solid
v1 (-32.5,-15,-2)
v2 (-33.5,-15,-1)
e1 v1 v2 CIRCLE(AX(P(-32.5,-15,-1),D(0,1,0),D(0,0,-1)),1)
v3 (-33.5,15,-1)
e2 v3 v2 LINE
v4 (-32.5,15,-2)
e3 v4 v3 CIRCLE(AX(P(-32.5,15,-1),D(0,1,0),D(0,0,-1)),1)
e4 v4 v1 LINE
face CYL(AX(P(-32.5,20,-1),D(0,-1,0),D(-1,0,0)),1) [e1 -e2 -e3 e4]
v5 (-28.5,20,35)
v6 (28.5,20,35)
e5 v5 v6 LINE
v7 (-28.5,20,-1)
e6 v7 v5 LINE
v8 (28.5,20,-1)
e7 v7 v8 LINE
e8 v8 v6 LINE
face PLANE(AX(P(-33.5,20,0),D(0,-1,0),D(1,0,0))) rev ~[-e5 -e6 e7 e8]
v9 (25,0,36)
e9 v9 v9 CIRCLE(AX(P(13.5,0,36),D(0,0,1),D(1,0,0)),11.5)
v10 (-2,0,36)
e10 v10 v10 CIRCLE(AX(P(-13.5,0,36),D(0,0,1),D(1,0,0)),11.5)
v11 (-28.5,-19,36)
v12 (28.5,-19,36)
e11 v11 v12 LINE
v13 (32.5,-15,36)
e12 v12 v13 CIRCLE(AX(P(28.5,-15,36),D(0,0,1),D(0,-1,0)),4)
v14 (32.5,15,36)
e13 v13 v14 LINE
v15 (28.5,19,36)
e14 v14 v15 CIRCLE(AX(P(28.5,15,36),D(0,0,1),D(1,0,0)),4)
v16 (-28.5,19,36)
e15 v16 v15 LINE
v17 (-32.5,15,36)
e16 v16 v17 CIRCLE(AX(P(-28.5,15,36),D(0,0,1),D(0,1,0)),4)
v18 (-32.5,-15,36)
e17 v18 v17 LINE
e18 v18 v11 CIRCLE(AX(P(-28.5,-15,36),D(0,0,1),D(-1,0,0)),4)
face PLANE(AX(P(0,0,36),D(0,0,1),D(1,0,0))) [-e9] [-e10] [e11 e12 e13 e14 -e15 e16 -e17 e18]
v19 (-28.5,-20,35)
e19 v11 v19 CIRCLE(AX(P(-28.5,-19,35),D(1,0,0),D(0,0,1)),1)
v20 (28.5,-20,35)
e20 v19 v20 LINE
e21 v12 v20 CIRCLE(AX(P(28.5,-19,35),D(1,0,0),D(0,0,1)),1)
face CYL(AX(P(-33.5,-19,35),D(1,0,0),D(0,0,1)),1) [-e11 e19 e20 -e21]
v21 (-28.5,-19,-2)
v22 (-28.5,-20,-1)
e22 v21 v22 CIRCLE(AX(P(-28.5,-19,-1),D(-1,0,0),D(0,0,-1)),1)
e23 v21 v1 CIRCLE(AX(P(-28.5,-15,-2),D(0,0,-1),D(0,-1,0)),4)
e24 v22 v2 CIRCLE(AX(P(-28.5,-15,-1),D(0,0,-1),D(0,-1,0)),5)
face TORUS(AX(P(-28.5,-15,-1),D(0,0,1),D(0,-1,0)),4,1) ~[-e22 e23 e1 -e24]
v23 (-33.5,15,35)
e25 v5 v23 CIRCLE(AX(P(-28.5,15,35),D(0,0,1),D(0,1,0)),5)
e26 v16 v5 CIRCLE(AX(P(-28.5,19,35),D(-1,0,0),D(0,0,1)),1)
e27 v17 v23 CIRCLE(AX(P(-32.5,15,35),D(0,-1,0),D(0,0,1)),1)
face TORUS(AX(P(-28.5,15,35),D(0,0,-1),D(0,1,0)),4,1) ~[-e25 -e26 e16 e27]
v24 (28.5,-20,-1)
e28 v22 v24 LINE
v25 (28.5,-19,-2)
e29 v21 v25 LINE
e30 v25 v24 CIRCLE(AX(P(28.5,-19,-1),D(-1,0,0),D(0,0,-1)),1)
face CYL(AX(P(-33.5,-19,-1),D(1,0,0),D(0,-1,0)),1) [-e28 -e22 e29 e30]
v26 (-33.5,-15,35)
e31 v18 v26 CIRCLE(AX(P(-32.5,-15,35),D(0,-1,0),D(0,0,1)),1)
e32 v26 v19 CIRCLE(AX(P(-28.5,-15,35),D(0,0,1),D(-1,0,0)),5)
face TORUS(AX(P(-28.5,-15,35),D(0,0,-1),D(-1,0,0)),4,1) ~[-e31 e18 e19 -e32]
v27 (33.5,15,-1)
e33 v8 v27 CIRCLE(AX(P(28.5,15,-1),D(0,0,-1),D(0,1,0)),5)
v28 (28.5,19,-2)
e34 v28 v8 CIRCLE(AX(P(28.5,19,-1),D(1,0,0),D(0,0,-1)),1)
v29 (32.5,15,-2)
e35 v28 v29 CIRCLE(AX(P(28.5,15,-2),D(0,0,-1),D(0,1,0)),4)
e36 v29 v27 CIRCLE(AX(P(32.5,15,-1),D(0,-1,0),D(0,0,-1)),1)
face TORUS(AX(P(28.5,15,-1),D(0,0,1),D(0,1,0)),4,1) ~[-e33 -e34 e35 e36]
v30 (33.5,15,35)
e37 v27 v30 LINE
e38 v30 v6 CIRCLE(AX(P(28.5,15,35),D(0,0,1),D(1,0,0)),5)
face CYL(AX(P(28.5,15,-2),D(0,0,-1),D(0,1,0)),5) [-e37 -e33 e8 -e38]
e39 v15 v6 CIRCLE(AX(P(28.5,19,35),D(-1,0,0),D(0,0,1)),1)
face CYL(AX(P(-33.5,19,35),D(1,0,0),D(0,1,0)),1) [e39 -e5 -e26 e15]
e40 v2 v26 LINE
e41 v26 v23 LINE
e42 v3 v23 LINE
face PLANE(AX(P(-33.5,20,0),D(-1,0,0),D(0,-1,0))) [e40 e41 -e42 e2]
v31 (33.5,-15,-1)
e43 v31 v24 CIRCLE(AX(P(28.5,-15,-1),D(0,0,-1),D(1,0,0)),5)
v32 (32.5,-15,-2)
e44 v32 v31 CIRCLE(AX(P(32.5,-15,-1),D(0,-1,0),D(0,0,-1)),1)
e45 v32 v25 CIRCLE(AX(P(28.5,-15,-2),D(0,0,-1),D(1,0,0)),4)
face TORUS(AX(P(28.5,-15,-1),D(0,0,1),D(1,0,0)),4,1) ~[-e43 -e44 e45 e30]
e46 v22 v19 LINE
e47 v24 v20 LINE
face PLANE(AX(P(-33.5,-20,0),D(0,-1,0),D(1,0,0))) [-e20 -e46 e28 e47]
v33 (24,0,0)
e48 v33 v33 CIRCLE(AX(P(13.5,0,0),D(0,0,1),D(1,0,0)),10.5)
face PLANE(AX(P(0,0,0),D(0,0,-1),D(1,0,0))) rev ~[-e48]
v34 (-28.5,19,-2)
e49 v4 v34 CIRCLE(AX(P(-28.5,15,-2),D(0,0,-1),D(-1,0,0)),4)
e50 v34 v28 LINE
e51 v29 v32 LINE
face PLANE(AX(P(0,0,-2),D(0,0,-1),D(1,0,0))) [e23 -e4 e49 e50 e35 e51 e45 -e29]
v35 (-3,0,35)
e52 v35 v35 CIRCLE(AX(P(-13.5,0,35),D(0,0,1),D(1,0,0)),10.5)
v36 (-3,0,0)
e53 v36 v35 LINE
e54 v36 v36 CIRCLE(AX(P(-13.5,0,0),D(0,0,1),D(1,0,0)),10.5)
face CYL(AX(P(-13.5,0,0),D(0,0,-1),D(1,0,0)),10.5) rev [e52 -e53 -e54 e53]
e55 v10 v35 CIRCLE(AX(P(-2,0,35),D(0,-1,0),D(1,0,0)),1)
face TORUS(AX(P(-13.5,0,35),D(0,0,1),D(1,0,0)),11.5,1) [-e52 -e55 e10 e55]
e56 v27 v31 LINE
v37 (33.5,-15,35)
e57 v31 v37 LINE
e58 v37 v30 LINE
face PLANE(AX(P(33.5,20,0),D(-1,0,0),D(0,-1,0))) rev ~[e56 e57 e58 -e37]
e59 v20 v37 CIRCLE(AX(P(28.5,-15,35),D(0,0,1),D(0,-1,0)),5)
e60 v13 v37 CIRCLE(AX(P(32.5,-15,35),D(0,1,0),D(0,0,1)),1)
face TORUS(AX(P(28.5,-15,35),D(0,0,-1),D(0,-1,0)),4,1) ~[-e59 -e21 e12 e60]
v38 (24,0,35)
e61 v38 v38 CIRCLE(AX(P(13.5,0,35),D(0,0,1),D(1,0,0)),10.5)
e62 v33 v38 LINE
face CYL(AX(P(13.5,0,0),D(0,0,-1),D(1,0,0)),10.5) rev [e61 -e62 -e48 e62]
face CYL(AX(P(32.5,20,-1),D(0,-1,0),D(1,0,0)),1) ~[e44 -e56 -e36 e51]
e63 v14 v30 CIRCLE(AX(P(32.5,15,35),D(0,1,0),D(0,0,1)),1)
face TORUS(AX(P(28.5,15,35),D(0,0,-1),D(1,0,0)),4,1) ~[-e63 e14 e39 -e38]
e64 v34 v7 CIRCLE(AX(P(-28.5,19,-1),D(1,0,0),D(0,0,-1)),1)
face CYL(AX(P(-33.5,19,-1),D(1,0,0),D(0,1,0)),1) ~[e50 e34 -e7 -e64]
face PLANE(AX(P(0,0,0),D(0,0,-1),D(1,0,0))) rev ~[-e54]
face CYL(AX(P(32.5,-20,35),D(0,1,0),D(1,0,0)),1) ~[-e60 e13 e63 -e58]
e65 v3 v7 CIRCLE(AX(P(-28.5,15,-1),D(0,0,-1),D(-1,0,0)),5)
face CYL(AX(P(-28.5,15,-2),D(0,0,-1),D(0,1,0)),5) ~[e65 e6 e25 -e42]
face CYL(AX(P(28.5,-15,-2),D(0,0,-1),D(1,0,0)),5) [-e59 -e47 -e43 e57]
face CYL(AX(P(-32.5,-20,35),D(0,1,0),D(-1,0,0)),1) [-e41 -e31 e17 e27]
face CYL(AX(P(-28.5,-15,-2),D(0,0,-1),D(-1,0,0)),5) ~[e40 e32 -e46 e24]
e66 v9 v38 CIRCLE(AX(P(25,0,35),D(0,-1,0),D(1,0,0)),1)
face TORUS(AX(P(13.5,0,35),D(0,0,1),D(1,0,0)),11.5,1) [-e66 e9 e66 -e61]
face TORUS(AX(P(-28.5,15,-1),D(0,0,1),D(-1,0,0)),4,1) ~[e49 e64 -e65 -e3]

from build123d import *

# Parameters (mm, degrees)
F0_W         = 67
F0_H         = 40
F0_R         = 10.5
F1_DEPTH     = 36
F2_W         = 67
F2_H         = 40
F3_DEPTH     = 2
F4_R         = 1
F5_T1_DEPTH  = 38
F5_T4_ANGLE  = 90
F5_T6_ANGLE  = 90
F5_T8_ANGLE  = 90
F5_T10_ANGLE = 90
F5_T12_ANGLE = 90
F5_T14_ANGLE = 90
F5_T16_ANGLE = 90
F5_T18_ANGLE = 90


# Not quite as in the source:
# - a fillet or chamfer that OpenCascade refuses, or shapes differently, is made with other operations: its cross-section is extruded or revolved along the edge and cut away or added


with BuildPart() as f1:
    # F0 (on Top) → F1 (new body)
    with BuildSketch(Plane.XY):
        Rectangle(F0_W, F0_H)
        with Locations((-13.5, 0)):
            Circle(F0_R, mode=Mode.SUBTRACT)
        with Locations((13.5, 0)):
            Circle(F0_R, mode=Mode.SUBTRACT)
    extrude(amount=F1_DEPTH)

    # F2 (on face) → F3 (join)
    with BuildSketch(Plane(origin=(0, 0, 0), x_dir=(1, 0, 0), z_dir=(0, 0, -1))):
        Rectangle(F2_W, F2_H)
    extrude(amount=F3_DEPTH)

    # F4
    f4_edges = [f1.edges().sort_by_distance(p)[0] for p in [
        (0, 20, 36),
        (-33.5, 0, 36),
        (0, -20, 36),
        (33.5, 0, 36),
        (-24, 0, 36),
        (3, 0, 36),
        (0, 20, -2),
        (33.5, 0, -2),
        (0, -20, -2),
        (-33.5, 0, -2),
    ]]
    fillet(f4_edges, radius=F4_R)

    # F5: fillet of radius 5 on 4 edges, made by hand

    # F5_s2 → F5_t1 (cut)
    with BuildSketch(Plane.XY.offset(-2)):
        with BuildLine():
            ThreePointArc((28.5, 20), (32.0355339059, 18.5355339059), (33.5, 15))
            Line((33.5, 15), (33.5, 20))
            Line((33.5, 20), (28.5, 20))
        make_face()
        with BuildLine():
            ThreePointArc((33.5, -15), (32.0355339059, -18.5355339059), (28.5, -20))
            Line((28.5, -20), (33.5, -20))
            Line((33.5, -20), (33.5, -15))
        make_face()
        with BuildLine():
            ThreePointArc((-33.5, -15), (-32.0355339059, -18.5355339059), (-28.5, -20))
            Line((-28.5, -20), (-33.5, -20))
            Line((-33.5, -20), (-33.5, -15))
        make_face()
        with BuildLine():
            ThreePointArc((-28.5, 20), (-32.0355339059, 18.5355339059), (-33.5, 15))
            Line((-33.5, 15), (-33.5, 20))
            Line((-33.5, 20), (-28.5, 20))
        make_face()
    extrude(amount=F5_T1_DEPTH, mode=Mode.SUBTRACT)

    # F5_s3 → F5_t4 (revolve, cut)
    with BuildSketch(Plane.XZ.offset(-15)):
        with BuildLine():
            ThreePointArc((-32.5, -2), (-33.2071067812, -1.7071067812), (-33.5, -1))
            Line((-33.5, -1), (-33.5, -2))
            Line((-33.5, -2), (-32.5, -2))
        make_face()
    revolve(axis=Axis((-28.5, 15, -2), (0, 0, -1)), revolution_arc=F5_T4_ANGLE, mode=Mode.SUBTRACT)

    # F5_s5 → F5_t6 (revolve, cut)
    with BuildSketch(Plane.YZ.offset(-28.5)):
        with BuildLine():
            ThreePointArc((19, 36), (19.7071067812, 35.7071067812), (20, 35))
            Line((20, 35), (20, 36))
            Line((20, 36), (19, 36))
        make_face()
    revolve(axis=Axis((-28.5, 15, 36), (0, 0, 1)), revolution_arc=F5_T6_ANGLE, mode=Mode.SUBTRACT)

    # F5_s7 → F5_t8 (revolve, cut)
    with BuildSketch(Plane.YZ.offset(-28.5)):
        with BuildLine():
            ThreePointArc((-19, -2), (-19.7071067812, -1.7071067812), (-20, -1))
            Line((-20, -1), (-20, -2))
            Line((-20, -2), (-19, -2))
        make_face()
    revolve(axis=Axis((-28.5, -15, -2), (0, 0, -1)), revolution_arc=F5_T8_ANGLE, mode=Mode.SUBTRACT)

    # F5_s9 → F5_t10 (revolve, cut)
    with BuildSketch(Plane.XZ.offset(15)):
        with BuildLine():
            ThreePointArc((-32.5, 36), (-33.2071067812, 35.7071067812), (-33.5, 35))
            Line((-33.5, 35), (-33.5, 36))
            Line((-33.5, 36), (-32.5, 36))
        make_face()
    revolve(axis=Axis((-28.5, -15, 36), (0, 0, 1)), revolution_arc=F5_T10_ANGLE, mode=Mode.SUBTRACT)

    # F5_s11 → F5_t12 (revolve, cut)
    with BuildSketch(Plane.YZ.offset(28.5)):
        with BuildLine():
            ThreePointArc((-19, 36), (-19.7071067812, 35.7071067812), (-20, 35))
            Line((-20, 35), (-20, 36))
            Line((-20, 36), (-19, 36))
        make_face()
    revolve(axis=Axis((28.5, -15, 36), (0, 0, 1)), revolution_arc=F5_T12_ANGLE, mode=Mode.SUBTRACT)

    # F5_s13 → F5_t14 (revolve, cut)
    with BuildSketch(Plane.XZ.offset(15)):
        with BuildLine():
            ThreePointArc((32.5, -2), (33.2071067812, -1.7071067812), (33.5, -1))
            Line((33.5, -1), (33.5, -2))
            Line((33.5, -2), (32.5, -2))
        make_face()
    revolve(axis=Axis((28.5, -15, -2), (0, 0, -1)), revolution_arc=F5_T14_ANGLE, mode=Mode.SUBTRACT)

    # F5_s15 → F5_t16 (revolve, cut)
    with BuildSketch(Plane.XZ.offset(-15)):
        with BuildLine():
            ThreePointArc((32.5, 36), (33.2071067812, 35.7071067812), (33.5, 35))
            Line((33.5, 35), (33.5, 36))
            Line((33.5, 36), (32.5, 36))
        make_face()
    revolve(axis=Axis((28.5, 15, 36), (0, 0, 1)), revolution_arc=F5_T16_ANGLE, mode=Mode.SUBTRACT)

    # F5_s17 → F5_t18 (revolve, cut)
    with BuildSketch(Plane.YZ.offset(28.5)):
        with BuildLine():
            ThreePointArc((19, -2), (19.7071067812, -1.7071067812), (20, -1))
            Line((20, -1), (20, -2))
            Line((20, -2), (19, -2))
        make_face()
    revolve(axis=Axis((28.5, 15, -2), (0, 0, -1)), revolution_arc=F5_T18_ANGLE, mode=Mode.SUBTRACT)


solid = f1.part
